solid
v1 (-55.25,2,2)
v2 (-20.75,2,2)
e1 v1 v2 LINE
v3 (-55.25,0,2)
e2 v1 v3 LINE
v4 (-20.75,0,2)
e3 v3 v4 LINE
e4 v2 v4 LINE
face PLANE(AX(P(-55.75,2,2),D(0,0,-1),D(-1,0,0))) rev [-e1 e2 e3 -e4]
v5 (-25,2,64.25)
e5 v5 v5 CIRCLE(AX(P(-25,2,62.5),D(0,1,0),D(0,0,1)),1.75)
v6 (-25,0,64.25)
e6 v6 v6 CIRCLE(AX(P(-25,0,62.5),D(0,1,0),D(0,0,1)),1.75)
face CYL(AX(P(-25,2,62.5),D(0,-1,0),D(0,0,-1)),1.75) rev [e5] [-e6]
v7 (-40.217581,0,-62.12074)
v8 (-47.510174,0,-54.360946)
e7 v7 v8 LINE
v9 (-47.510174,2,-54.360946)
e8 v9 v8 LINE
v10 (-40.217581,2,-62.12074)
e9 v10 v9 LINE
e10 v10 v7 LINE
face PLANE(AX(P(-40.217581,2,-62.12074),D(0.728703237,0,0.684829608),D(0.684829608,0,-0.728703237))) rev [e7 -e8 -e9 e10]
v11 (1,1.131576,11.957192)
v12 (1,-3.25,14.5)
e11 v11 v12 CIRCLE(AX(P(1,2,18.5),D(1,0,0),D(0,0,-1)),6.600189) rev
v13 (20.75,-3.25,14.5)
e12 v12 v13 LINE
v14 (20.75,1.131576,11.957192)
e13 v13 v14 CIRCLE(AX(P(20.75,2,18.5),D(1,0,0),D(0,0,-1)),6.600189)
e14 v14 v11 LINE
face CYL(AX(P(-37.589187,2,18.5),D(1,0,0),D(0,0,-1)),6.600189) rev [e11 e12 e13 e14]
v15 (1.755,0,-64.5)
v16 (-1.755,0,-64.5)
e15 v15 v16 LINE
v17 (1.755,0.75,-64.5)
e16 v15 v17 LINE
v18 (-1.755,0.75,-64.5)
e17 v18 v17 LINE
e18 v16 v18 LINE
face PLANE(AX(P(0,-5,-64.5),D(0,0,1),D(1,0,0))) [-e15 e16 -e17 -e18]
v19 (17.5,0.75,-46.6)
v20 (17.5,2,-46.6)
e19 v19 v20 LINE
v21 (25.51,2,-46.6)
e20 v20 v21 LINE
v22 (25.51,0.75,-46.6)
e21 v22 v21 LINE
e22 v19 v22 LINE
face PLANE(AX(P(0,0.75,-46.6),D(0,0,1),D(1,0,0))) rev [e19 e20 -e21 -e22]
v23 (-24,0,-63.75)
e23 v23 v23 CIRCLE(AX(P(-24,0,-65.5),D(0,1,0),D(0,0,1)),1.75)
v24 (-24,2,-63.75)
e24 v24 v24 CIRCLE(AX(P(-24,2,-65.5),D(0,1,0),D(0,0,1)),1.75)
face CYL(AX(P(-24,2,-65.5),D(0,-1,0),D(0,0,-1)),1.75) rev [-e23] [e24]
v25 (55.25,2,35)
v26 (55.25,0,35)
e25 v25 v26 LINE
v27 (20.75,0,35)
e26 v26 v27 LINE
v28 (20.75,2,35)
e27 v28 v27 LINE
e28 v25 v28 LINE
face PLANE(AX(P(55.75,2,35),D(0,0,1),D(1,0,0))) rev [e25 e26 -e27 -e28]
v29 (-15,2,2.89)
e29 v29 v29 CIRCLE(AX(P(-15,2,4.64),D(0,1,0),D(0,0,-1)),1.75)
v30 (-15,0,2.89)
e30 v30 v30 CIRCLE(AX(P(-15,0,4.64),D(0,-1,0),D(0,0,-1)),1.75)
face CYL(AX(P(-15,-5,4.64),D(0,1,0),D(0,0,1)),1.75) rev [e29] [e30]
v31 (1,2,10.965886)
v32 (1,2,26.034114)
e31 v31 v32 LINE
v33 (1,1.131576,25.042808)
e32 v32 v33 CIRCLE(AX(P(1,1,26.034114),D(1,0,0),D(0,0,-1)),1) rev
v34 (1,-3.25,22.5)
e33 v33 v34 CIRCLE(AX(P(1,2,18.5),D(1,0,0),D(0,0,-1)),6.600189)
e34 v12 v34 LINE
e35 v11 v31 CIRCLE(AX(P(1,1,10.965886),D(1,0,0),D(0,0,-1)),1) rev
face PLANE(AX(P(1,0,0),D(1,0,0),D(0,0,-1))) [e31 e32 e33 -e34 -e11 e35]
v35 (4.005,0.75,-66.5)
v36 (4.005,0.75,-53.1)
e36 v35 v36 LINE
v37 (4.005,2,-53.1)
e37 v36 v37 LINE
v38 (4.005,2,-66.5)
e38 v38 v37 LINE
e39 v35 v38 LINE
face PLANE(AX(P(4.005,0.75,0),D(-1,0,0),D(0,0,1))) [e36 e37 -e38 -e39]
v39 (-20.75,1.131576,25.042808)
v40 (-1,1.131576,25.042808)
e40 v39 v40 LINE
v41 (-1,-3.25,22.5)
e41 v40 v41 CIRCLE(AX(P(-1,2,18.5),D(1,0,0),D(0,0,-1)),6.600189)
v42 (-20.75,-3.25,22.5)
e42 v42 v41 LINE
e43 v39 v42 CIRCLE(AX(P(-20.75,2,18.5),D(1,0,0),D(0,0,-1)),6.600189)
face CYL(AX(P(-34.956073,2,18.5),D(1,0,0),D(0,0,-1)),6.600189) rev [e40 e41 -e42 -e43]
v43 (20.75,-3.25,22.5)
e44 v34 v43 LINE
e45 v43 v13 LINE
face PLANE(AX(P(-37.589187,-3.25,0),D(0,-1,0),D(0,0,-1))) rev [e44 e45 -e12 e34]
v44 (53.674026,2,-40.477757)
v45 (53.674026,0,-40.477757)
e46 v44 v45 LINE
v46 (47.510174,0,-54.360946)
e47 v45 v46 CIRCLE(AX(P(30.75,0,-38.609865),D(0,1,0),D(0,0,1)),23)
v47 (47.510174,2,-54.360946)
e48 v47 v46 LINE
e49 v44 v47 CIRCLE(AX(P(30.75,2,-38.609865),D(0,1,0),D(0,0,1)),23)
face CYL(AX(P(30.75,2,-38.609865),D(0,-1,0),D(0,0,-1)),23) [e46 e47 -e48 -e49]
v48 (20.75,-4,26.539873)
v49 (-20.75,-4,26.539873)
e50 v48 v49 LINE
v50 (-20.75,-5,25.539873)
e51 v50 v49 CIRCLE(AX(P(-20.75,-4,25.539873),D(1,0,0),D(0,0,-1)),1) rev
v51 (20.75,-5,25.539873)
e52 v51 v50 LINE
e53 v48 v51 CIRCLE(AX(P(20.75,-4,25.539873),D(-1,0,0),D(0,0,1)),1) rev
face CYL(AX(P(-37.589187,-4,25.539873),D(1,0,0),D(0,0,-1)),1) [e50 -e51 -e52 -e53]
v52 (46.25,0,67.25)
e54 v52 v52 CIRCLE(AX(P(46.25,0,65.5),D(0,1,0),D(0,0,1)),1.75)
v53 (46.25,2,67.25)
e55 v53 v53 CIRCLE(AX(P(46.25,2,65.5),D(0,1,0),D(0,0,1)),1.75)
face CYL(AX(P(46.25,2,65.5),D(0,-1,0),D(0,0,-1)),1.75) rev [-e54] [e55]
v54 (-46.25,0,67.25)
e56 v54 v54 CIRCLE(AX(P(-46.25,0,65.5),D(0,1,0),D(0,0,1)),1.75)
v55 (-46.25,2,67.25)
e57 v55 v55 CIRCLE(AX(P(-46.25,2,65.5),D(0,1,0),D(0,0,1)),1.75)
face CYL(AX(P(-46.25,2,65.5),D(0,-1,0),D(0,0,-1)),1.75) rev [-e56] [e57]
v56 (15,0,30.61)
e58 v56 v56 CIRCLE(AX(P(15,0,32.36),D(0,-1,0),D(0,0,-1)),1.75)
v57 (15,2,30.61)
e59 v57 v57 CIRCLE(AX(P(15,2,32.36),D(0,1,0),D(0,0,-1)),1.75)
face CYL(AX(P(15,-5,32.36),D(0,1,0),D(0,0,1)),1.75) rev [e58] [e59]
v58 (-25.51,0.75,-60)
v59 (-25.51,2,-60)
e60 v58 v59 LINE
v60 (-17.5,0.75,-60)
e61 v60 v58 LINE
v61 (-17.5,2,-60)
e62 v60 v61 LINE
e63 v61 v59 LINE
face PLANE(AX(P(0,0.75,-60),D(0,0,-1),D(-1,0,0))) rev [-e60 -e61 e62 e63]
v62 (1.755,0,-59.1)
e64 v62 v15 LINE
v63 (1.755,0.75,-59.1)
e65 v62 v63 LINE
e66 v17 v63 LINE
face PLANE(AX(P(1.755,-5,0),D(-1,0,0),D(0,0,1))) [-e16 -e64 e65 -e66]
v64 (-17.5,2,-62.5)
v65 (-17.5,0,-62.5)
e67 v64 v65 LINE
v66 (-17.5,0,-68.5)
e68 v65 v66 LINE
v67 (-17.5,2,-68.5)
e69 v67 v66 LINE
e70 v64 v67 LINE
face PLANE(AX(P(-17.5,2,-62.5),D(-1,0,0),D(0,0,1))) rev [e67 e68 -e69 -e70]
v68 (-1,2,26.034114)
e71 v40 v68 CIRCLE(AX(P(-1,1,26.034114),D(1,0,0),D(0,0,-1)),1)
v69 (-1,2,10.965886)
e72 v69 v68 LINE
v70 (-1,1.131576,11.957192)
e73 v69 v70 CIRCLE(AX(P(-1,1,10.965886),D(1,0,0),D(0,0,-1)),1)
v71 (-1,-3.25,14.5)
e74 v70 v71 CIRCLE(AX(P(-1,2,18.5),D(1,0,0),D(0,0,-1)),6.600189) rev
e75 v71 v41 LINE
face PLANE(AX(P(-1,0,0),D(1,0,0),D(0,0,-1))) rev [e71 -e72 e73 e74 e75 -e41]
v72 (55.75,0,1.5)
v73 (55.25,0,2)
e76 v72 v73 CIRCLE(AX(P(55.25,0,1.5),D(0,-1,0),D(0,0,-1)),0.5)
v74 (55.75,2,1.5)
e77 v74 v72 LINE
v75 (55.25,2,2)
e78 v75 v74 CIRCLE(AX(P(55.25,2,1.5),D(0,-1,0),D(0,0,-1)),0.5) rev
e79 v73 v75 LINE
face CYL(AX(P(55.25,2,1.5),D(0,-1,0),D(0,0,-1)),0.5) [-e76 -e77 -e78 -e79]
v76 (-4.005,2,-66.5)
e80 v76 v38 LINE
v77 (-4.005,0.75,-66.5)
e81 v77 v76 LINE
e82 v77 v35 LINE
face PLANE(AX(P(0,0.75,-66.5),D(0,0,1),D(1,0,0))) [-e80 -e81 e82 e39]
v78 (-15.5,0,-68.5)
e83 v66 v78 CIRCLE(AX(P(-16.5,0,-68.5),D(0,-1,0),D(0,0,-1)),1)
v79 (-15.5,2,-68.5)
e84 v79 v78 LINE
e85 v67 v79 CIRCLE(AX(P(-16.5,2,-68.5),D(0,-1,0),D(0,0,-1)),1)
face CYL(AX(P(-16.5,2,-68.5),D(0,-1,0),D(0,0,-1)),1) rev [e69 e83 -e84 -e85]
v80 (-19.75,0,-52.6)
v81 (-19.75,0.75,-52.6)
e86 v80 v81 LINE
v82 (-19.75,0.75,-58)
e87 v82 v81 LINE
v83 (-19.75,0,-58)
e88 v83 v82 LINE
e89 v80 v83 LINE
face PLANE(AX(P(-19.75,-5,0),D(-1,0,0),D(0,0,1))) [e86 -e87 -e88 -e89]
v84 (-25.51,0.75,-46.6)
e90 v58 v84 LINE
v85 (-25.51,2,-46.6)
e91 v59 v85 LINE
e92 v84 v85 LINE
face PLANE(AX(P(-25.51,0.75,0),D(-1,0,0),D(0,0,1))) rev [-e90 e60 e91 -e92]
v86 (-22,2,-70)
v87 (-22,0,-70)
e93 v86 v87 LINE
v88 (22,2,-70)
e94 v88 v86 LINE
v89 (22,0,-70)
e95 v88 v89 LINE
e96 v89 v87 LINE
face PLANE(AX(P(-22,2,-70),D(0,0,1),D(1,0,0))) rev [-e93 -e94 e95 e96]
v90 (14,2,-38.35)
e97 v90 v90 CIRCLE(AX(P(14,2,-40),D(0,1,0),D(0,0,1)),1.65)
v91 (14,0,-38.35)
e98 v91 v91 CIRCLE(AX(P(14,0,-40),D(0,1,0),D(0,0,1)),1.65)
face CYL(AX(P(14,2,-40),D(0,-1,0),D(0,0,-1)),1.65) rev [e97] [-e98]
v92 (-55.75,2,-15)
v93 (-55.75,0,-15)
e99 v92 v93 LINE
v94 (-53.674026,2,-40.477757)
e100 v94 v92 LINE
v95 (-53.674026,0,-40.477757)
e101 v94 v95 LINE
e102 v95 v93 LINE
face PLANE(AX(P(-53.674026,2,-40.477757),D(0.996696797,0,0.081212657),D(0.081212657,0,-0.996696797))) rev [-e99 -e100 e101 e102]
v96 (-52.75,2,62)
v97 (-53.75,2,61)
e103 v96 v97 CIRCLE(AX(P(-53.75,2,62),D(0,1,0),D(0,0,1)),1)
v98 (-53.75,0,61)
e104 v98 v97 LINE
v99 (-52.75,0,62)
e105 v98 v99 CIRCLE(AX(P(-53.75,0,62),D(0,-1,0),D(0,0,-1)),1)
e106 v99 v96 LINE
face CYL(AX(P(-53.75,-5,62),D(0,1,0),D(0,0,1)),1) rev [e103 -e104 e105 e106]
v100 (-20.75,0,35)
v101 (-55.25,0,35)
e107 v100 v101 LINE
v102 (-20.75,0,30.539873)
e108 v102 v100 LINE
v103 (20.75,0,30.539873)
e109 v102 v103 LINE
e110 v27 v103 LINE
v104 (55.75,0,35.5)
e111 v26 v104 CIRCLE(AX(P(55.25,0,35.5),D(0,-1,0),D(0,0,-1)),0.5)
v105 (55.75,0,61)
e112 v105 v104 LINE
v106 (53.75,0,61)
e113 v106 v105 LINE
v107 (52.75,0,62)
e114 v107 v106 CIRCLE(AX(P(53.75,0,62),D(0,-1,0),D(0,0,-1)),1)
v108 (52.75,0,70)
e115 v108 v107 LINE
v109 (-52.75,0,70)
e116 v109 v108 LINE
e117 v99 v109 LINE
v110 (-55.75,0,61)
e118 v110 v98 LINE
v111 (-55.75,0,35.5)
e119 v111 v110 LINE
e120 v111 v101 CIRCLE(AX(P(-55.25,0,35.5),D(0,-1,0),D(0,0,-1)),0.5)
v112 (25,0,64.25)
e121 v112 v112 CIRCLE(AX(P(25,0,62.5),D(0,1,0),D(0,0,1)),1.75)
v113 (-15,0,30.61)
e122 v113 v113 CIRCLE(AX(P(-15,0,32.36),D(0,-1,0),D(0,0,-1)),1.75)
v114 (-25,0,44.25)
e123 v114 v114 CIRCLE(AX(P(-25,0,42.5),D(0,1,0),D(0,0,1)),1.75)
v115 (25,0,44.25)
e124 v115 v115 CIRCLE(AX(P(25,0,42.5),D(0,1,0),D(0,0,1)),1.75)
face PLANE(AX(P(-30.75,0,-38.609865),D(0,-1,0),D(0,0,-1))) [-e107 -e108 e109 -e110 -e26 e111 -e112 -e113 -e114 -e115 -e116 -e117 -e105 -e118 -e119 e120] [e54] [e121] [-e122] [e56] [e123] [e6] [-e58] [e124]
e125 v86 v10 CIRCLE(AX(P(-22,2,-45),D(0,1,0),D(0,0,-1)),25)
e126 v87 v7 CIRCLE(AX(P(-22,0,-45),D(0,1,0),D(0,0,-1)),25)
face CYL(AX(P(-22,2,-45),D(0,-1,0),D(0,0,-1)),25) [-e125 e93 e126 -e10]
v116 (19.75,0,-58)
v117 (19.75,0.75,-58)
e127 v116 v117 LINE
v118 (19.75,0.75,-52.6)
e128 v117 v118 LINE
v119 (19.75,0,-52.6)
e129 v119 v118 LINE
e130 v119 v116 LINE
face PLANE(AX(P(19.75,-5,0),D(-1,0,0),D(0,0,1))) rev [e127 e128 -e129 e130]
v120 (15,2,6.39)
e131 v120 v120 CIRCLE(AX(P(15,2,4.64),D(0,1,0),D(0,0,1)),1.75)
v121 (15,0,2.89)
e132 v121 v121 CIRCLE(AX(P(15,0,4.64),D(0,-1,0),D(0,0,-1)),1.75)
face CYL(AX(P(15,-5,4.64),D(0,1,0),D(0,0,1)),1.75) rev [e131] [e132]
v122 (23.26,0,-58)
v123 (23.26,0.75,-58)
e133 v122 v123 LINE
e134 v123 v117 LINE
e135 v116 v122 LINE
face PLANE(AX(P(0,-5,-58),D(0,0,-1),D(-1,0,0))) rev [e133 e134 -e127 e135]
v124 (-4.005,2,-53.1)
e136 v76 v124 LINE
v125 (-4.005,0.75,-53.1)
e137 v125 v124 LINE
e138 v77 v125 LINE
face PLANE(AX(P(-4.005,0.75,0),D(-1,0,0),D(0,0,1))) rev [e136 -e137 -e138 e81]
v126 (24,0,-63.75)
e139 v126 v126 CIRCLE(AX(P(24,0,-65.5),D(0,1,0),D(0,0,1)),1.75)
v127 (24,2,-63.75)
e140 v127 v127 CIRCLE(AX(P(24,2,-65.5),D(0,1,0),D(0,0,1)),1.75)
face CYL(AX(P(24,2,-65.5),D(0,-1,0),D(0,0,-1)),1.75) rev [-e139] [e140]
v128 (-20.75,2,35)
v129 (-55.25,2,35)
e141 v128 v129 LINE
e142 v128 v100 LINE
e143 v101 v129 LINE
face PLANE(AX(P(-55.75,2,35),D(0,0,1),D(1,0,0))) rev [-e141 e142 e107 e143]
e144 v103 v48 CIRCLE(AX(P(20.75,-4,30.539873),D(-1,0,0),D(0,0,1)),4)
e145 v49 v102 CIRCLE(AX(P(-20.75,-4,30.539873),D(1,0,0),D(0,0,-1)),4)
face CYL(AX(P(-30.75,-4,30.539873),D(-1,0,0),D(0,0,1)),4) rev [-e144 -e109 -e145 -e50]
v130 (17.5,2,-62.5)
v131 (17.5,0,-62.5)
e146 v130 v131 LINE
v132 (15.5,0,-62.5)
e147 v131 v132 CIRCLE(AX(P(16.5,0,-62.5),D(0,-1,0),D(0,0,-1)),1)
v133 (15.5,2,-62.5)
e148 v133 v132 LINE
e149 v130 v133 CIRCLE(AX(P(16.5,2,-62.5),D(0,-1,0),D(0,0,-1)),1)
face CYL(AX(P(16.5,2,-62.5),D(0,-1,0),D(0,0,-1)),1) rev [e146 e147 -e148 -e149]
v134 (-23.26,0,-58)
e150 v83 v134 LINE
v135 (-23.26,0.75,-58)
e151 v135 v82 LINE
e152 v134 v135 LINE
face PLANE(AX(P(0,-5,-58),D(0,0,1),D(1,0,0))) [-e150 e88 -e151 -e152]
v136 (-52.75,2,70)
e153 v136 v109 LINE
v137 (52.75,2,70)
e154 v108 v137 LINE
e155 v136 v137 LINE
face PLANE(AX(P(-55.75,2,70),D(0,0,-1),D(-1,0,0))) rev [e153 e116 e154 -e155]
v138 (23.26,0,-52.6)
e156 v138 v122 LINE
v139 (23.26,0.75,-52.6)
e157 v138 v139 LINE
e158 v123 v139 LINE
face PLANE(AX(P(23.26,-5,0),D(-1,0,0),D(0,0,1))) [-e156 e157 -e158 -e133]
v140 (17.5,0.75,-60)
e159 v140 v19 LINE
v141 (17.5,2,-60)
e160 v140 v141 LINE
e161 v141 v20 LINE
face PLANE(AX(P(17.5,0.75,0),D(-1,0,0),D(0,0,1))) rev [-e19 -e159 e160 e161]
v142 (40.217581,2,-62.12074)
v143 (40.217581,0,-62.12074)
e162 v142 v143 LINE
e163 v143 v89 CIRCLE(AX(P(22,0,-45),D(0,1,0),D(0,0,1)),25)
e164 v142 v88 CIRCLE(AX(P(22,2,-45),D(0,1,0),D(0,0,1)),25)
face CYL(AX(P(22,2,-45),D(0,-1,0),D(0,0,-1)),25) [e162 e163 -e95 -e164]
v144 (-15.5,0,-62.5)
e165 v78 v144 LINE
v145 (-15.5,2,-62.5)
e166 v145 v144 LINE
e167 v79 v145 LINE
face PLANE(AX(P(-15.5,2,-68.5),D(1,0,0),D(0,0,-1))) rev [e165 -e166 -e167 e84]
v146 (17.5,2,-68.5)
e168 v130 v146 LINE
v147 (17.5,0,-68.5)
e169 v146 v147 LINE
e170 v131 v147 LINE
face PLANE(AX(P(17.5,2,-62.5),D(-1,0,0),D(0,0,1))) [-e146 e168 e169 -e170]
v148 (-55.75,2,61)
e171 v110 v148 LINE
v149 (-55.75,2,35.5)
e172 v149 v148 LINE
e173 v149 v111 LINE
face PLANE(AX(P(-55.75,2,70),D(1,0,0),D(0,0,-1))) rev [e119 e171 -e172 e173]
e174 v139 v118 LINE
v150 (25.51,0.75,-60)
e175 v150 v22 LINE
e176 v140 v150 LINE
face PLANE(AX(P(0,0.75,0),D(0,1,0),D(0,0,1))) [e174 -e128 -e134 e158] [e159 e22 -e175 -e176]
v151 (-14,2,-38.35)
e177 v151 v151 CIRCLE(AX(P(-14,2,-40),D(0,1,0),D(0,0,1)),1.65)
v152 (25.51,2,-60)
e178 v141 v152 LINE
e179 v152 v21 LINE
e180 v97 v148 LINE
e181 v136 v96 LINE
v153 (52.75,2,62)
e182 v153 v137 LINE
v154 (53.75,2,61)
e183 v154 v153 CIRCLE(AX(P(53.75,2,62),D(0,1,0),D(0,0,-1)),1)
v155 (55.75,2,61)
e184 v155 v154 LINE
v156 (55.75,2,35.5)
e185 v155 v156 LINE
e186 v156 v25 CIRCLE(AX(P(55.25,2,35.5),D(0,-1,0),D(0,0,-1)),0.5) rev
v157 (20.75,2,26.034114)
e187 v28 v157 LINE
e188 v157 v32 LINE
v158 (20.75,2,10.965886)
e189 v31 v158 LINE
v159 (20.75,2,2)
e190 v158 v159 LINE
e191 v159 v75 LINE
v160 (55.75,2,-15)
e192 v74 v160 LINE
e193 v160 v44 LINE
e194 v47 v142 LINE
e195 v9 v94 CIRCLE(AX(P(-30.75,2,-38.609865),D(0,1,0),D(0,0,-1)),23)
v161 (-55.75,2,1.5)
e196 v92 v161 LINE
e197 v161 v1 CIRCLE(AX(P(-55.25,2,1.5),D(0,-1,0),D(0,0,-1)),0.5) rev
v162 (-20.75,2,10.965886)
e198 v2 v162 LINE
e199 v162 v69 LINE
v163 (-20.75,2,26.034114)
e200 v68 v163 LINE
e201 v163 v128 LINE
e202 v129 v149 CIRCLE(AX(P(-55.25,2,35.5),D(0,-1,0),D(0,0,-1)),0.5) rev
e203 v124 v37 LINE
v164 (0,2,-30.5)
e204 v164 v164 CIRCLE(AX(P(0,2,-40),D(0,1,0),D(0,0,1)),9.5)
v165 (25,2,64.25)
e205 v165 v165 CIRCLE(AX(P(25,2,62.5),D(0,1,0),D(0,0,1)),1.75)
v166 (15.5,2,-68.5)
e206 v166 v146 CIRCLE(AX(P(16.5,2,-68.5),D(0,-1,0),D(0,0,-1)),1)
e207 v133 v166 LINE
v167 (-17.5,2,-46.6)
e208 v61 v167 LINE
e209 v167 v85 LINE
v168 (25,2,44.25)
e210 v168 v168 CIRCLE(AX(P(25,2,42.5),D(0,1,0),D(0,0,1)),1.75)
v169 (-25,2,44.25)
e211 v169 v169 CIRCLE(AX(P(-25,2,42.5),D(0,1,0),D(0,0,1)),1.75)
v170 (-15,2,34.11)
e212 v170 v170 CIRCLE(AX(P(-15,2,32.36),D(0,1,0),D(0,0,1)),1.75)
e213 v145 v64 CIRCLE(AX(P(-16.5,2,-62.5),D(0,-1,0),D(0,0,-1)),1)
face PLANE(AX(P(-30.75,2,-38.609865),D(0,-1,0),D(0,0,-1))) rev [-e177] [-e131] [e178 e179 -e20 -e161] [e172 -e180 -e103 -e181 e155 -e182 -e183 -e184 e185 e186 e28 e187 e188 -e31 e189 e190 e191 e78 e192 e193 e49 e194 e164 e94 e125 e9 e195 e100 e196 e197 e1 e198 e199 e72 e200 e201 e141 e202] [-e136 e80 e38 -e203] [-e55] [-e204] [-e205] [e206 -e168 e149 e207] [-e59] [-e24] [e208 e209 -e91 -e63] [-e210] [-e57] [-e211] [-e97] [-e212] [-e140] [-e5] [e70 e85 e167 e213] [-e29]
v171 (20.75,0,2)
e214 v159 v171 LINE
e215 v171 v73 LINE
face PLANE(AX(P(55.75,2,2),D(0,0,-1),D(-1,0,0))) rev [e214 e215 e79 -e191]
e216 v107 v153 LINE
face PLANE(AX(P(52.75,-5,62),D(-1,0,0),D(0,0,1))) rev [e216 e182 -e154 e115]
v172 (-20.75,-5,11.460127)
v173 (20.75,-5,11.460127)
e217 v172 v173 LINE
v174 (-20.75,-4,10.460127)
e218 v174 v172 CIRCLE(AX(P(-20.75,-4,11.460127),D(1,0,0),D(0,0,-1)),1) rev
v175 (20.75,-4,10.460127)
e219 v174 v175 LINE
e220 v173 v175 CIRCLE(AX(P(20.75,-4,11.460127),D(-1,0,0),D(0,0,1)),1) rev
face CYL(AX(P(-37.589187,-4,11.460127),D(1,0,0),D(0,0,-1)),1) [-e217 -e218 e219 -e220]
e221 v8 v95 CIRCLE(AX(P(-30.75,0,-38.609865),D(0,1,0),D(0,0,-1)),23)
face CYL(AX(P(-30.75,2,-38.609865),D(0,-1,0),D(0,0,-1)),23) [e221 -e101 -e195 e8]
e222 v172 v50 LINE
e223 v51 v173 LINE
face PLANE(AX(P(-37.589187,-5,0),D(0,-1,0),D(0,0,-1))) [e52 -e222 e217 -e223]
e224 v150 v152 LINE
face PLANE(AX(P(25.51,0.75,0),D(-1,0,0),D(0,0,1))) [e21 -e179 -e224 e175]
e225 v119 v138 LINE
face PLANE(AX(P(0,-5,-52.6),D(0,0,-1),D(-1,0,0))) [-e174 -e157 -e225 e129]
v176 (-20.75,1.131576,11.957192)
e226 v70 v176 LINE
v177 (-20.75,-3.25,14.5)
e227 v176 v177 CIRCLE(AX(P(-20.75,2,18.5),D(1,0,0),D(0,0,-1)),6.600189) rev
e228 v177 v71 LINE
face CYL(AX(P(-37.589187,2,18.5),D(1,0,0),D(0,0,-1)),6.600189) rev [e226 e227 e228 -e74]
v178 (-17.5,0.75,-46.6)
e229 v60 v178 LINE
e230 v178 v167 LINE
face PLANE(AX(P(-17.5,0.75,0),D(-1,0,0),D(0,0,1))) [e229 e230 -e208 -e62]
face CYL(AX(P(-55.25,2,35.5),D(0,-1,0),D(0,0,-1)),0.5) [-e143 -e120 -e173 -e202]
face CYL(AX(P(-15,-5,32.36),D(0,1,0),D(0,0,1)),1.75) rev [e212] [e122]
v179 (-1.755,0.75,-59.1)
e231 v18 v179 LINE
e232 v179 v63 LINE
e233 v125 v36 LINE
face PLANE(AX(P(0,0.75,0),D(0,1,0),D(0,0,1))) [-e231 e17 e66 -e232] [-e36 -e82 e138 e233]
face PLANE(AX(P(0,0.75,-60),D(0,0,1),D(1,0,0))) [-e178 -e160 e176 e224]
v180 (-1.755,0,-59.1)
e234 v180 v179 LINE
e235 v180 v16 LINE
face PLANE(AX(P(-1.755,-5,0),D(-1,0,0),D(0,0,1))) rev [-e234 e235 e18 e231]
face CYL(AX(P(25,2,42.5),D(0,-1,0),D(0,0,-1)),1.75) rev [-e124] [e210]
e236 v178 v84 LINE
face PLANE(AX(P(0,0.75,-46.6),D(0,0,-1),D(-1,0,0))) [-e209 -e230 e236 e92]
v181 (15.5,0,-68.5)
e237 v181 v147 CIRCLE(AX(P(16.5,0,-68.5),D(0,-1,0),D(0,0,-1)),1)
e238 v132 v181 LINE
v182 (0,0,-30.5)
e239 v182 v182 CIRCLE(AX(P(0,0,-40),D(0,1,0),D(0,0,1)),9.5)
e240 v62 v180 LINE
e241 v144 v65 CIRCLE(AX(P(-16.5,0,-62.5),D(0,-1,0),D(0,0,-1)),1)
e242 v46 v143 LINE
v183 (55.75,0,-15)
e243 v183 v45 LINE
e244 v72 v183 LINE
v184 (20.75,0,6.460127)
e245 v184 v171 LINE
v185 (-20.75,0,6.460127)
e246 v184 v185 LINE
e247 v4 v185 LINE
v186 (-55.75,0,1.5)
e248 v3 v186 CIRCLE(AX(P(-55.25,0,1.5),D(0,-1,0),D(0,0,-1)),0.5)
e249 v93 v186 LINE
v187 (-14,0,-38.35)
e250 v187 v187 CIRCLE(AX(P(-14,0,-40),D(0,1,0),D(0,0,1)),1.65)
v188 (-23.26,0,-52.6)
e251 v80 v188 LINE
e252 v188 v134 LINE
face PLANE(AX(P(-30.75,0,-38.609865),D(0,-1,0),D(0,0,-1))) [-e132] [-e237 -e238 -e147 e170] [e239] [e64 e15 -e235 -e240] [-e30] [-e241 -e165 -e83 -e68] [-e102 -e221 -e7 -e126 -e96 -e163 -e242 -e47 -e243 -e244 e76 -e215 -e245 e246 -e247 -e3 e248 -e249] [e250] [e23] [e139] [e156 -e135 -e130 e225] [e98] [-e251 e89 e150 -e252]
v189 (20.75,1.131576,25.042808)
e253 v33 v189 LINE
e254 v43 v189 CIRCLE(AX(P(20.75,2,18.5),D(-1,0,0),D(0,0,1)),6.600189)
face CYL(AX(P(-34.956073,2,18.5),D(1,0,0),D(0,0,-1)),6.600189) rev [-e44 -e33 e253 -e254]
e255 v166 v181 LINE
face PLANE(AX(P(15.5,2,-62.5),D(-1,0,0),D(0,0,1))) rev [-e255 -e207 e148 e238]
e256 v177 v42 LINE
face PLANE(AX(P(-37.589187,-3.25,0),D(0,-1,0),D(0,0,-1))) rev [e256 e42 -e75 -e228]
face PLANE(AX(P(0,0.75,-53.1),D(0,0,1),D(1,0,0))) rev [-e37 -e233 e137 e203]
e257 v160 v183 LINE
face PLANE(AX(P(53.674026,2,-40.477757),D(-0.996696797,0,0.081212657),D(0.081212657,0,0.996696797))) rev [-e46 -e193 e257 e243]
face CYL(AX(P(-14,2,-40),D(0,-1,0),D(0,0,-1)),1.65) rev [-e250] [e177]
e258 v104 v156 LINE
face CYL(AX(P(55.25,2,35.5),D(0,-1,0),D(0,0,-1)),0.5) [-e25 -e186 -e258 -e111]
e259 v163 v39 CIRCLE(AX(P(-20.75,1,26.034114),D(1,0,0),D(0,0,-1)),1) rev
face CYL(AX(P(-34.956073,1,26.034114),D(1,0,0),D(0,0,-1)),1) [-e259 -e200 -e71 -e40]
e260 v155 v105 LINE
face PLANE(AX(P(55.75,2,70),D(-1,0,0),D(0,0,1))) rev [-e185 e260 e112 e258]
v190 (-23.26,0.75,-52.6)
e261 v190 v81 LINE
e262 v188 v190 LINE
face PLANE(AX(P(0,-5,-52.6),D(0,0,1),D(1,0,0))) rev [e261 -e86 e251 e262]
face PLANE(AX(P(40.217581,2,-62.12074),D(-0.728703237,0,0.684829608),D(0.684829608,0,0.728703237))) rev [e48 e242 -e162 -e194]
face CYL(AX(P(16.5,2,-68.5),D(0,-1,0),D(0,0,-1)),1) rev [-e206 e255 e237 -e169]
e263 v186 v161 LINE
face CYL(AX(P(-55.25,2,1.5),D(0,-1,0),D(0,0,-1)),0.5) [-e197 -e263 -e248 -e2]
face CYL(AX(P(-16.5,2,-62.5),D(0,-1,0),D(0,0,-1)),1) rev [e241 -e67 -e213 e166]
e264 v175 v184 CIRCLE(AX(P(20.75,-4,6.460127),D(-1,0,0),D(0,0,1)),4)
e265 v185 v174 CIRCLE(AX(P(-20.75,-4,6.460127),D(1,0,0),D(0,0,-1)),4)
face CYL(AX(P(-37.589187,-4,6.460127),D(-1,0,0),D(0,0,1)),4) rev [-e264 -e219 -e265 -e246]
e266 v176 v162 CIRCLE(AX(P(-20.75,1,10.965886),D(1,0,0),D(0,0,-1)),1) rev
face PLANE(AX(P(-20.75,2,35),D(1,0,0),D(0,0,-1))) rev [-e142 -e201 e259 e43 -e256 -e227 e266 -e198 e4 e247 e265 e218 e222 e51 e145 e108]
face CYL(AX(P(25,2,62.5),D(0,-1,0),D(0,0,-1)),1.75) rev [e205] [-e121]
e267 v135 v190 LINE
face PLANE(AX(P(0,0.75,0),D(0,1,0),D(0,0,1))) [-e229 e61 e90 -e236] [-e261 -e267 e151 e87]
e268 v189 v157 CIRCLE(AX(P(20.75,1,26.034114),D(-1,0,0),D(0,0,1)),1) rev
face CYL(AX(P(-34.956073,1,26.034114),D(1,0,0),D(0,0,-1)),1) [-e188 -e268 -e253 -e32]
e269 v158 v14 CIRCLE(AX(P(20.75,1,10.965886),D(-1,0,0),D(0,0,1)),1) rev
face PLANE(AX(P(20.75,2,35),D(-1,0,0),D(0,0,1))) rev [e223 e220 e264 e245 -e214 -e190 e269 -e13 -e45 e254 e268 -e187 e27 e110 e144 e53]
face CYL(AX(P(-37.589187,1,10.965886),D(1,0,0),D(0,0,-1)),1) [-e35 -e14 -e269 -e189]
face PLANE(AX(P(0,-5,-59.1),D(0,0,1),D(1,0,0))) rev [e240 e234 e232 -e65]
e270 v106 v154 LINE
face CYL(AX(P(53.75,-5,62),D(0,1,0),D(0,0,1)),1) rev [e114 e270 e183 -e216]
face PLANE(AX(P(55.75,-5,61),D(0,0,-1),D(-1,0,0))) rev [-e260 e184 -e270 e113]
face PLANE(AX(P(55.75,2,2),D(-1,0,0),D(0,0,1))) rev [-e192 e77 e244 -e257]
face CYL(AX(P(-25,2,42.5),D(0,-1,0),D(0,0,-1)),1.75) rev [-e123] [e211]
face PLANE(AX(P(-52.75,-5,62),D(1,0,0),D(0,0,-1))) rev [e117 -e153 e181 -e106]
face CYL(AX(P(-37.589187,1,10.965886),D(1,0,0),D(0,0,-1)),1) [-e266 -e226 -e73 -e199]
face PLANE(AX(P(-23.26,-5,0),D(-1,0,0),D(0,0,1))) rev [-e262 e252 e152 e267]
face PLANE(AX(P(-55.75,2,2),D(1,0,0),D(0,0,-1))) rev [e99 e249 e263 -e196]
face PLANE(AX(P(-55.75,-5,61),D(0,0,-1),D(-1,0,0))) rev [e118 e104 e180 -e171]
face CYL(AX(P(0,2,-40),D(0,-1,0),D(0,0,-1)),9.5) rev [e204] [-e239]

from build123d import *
from OCP.BRepFilletAPI import BRepFilletAPI_MakeFillet

# Parameters (mm, degrees)
SKETCH1_R               = 1.75
SKETCH1_R_2             = 1.65
SKETCH1_R_3             = 9.5
BOSS_EXTRUDE1_DEPTH     = 2
CUT_EXTRUDE1_DEPTH      = 41.5
BOSS_EXTRUDE2_DEPTH     = 41.5
SKETCH6_W               = 16.079745626
SKETCH6_H               = 7
BOSS_EXTRUDE3_DEPTH     = 1
FILLET1_R               = 4
FILLET1_R_2             = 1
SKETCH7_R               = 1.75
CUT_EXTRUDE2_DEPTH      = 90.76114137
FILLET2_R               = 0.5
CUT_EXTRUDE3_DEPTH      = 90.76114137
SKETCH9_W               = 8.01
SKETCH9_H               = 13.4
SKETCH9_W_2             = 3.51
SKETCH9_H_2             = 5.4
CUT_EXTRUDE4_DEPTH      = 1.25
SKETCH9_4_W             = 3.51
SKETCH9_4_H             = 5.4
CUT_EXTRUDE5_DEPTH      = 90.76114137
ENL_V_MAT_EXTRU_1_DEPTH = 90.627353526


with BuildPart() as part:
    # Sketch1 → Boss-Extrude1 (new body)
    with BuildSketch(Plane(origin=(0, 0, 0), x_dir=(1, 0, 0), z_dir=(0, 1, 0))):
        with BuildLine():
            Line((-22, 70), (22, 70))
            ThreePointArc((22, 70), (31.924250474, 67.945789429), (40.217580929, 62.120740202))
            Line((40.217580929, 62.120740202), (47.510174455, 54.360946457))
            ThreePointArc((47.510174455, 54.360946457), (51.771291303, 47.94288813), (53.674026321, 40.47775659))
            Line((53.674026321, 40.47775659), (55.75, 15))
            Line((55.75, 15), (55.75, -2))
            Line((55.75, -2), (20.75, -2))
            Line((20.75, -2), (20.75, -35))
            Line((20.75, -35), (55.75, -35))
            Line((55.75, -35), (55.75, -70))
            Line((55.75, -70), (-55.75, -70))
            Line((-55.75, -70), (-55.75, -35))
            Line((-55.75, -35), (-20.75, -35))
            Line((-20.75, -35), (-20.75, -2))
            Line((-20.75, -2), (-55.75, -2))
            Line((-55.75, -2), (-55.75, 15))
            Line((-55.75, 15), (-53.674026321, 40.47775659))
            ThreePointArc((-53.674026321, 40.47775659), (-51.771291303, 47.94288813), (-47.510174455, 54.360946457))
            Line((-47.510174455, 54.360946457), (-40.217580929, 62.120740202))
            ThreePointArc((-40.217580929, 62.120740202), (-31.924250474, 67.945789429), (-22, 70))
        make_face()
        with Locations(Location((-46.25, -65.5, 0), (0, 0, 270))):
            Circle(SKETCH1_R, mode=Mode.SUBTRACT)
        with Locations(Location((46.25, -65.5, 0), (0, 0, 270))):
            Circle(SKETCH1_R, mode=Mode.SUBTRACT)
        with Locations(Location((-24, 65.5, 0), (0, 0, 270))):
            Circle(SKETCH1_R, mode=Mode.SUBTRACT)
        with Locations(Location((24, 65.5, 0), (0, 0, 270))):
            Circle(SKETCH1_R, mode=Mode.SUBTRACT)
        with Locations(Location((-25, -42.5, 0), (0, 0, 270))):
            Circle(SKETCH1_R, mode=Mode.SUBTRACT)
        with Locations(Location((-25, -62.5, 0), (0, 0, 270))):
            Circle(SKETCH1_R, mode=Mode.SUBTRACT)
        with Locations(Location((25, -42.5, 0), (0, 0, 270))):
            Circle(SKETCH1_R, mode=Mode.SUBTRACT)
        with Locations(Location((25, -62.5, 0), (0, 0, 270))):
            Circle(SKETCH1_R, mode=Mode.SUBTRACT)
        with Locations(Location((-14, 40, 0), (0, 0, 270))):
            Circle(SKETCH1_R_2, mode=Mode.SUBTRACT)
        with Locations(Location((14, 40, 0), (0, 0, 270))):
            Circle(SKETCH1_R_2, mode=Mode.SUBTRACT)
        with Locations(Location((0, 40, 0), (0, 0, 270))):
            Circle(SKETCH1_R_3, mode=Mode.SUBTRACT)
    extrude(amount=BOSS_EXTRUDE1_DEPTH)

    # Sketch5 → Cut-Extrude1 (cut)
    with BuildSketch(Plane(origin=(20.75, 0, 0), x_dir=(0, 0, -1), z_dir=(1, 0, 0))):
        with BuildLine():
            Line((-25.100189391, 2), (-11.899810609, 2))
            ThreePointArc((-11.899810609, 2), (-12.585473072, -0.929312414), (-14.5, -3.25))
            Line((-14.5, -3.25), (-22.5, -3.25))
            ThreePointArc((-22.5, -3.25), (-24.414526928, -0.929312414), (-25.100189391, 2))
        make_face()
    extrude(amount=-CUT_EXTRUDE1_DEPTH, mode=Mode.SUBTRACT)


with BuildPart() as cut_extrude1_piece_1:
    # of the separate pieces the step leaves, piece 1, a body of its own (cut_extrude1_pieces)
    add(part.part.solids().sort_by_distance((-22, 0, -70))[0])



with BuildPart() as cut_extrude1_piece_2:
    # of the separate pieces the step leaves, piece 2, a body of its own (cut_extrude1_pieces)
    add(part.part.solids().sort_by_distance((-20.75, 0, 35))[0])

    # Sketch5<3> → Boss-Extrude2 (add)
    with BuildSketch(Plane(origin=(20.75, 0, 0), x_dir=(0, 0, -1), z_dir=(1, 0, 0))):
        with BuildLine():
            Line((-24.789872813, 0), (-26.539872813, 0))
            Line((-26.539872813, 0), (-26.539872813, -5))
            Line((-26.539872813, -5), (-10.460127187, -5))
            Line((-10.460127187, -5), (-10.460127187, 0))
            Line((-10.460127187, 0), (-12.210127187, 0))
            ThreePointArc((-12.210127187, 0), (-13.10453935, -1.801513432), (-14.5, -3.25))
            Line((-14.5, -3.25), (-22.5, -3.25))
            ThreePointArc((-22.5, -3.25), (-23.89546065, -1.801513432), (-24.789872813, 0))
        make_face()
    extrude(amount=-BOSS_EXTRUDE2_DEPTH)


with BuildPart() as cut_extrude1_piece_1_1:
    add(cut_extrude1_piece_1.part)

    add(cut_extrude1_piece_2.part)  # Boss-Extrude3 merges Cut-Extrude1 piece 2
    # Sketch6 → Boss-Extrude3 (add, symmetric)
    with BuildSketch(Plane(origin=(0, 0, 0), x_dir=(0, 0, -1), z_dir=(1, 0, 0))):
        with Locations((-18.5, -1.5)):
            Rectangle(SKETCH6_W, SKETCH6_H)
    extrude(amount=BOSS_EXTRUDE3_DEPTH, both=True)

    # Fillet1
    fillet1_edges_1 = [cut_extrude1_piece_1_1.edges().sort_by_distance(p)[0] for p in [
        (0, 0, 26.539872813),
        (0, 0, 10.460127187),
    ]]
    fillet1_edges_2 = [cut_extrude1_piece_1_1.edges().sort_by_distance(p)[0] for p in [
        (0, -5, 26.539872813),
        (0, -5, 10.460127187),
        (-10.875, 2, 25.100189391),
        (10.875, 2, 25.100189391),
        (10.875, 2, 11.899810609),
        (-10.875, 2, 11.899810609),
    ]]
    fillet1 = BRepFilletAPI_MakeFillet(cut_extrude1_piece_1_1.part.solid().wrapped)
    for e in fillet1_edges_1:
        fillet1.Add(FILLET1_R - 0.0001, e.wrapped)
    for e in fillet1_edges_2:
        fillet1.Add(FILLET1_R_2 - 0.0001, e.wrapped)
    add(Compound.cast(fillet1.Shape()), mode=Mode.REPLACE)  # a hair under: the kernel refuses the full size

    # Sketch7 → Cut-Extrude2 (cut, through all)
    with BuildSketch(Plane(origin=(0, 2, 0), x_dir=(1, 0, 0), z_dir=(0, 1, 0))):
        with Locations(Location((15, -4.64, 0), (0, 0, 270))):
            Circle(SKETCH7_R)
        with Locations(Location((-15, -4.64, 0), (0, 0, 90))):
            Circle(SKETCH7_R)
        with Locations(Location((-15, -32.36, 0), (0, 0, 270))):
            Circle(SKETCH7_R)
        with Locations(Location((15, -32.36, 0), (0, 0, 90))):
            Circle(SKETCH7_R)
    extrude(amount=-CUT_EXTRUDE2_DEPTH, mode=Mode.SUBTRACT)

    # Fillet2
    fillet2_edges = [cut_extrude1_piece_1_1.edges().sort_by_distance(p)[0] for p in [
        (-55.75, 1, 35),
        (55.75, 1, 35),
        (55.75, 1, 2),
        (-55.75, 1, 2),
    ]]
    fillet(fillet2_edges, radius=FILLET2_R)

    # Sketch8 → Cut-Extrude3 (cut, through all)
    with BuildSketch(Plane(origin=(0, 2, 0), x_dir=(1, 0, 0), z_dir=(0, 1, 0))):
        with BuildLine():
            Line((-55.75, -61), (-53.75, -61))
            ThreePointArc((-53.75, -61), (-53.042893219, -61.292893219), (-52.75, -62))
            Line((-52.75, -62), (-52.75, -70))
            Line((-52.75, -70), (-55.75, -70))
            Line((-55.75, -70), (-55.75, -61))
        make_face()
        with BuildLine():
            Line((55.75, -61), (53.75, -61))
            ThreePointArc((53.75, -61), (53.042893219, -61.292893219), (52.75, -62))
            Line((52.75, -62), (52.75, -70))
            Line((52.75, -70), (55.75, -70))
            Line((55.75, -70), (55.75, -61))
        make_face()
    extrude(amount=-CUT_EXTRUDE3_DEPTH, mode=Mode.SUBTRACT)

    # Sketch9 → Cut-Extrude4 (cut)
    # profile 1 of 6: a face of its own
    with BuildSketch(Plane(origin=(0, 2, 0), x_dir=(1, 0, 0), z_dir=(0, 1, 0))):
        with Locations((-21.505, 53.3)):
            Rectangle(SKETCH9_W, SKETCH9_H)
        with Locations((-21.505, 55.3)):
            Rectangle(SKETCH9_W_2, SKETCH9_H_2, mode=Mode.SUBTRACT)
    # profile 2 of 6: a face of its own
    with BuildSketch(Plane(origin=(0, 2, 0), x_dir=(1, 0, 0), z_dir=(0, 1, 0))):
        with Locations((-21.505, 55.3)):
            Rectangle(SKETCH9_W_2, SKETCH9_H_2)
    # profile 3 of 6: a face of its own
    with BuildSketch(Plane(origin=(0, 2, 0), x_dir=(1, 0, 0), z_dir=(0, 1, 0))):
        with Locations((0, 59.8)):
            Rectangle(SKETCH9_W, SKETCH9_H)
        with Locations((0, 61.8)):
            Rectangle(SKETCH9_W_2, SKETCH9_H_2, mode=Mode.SUBTRACT)
    # profile 4 of 6: a face of its own
    with BuildSketch(Plane(origin=(0, 2, 0), x_dir=(1, 0, 0), z_dir=(0, 1, 0))):
        with Locations((0, 61.8)):
            Rectangle(SKETCH9_W_2, SKETCH9_H_2)
    # profile 5 of 6: a face of its own
    with BuildSketch(Plane(origin=(0, 2, 0), x_dir=(1, 0, 0), z_dir=(0, 1, 0))):
        with Locations((21.505, 53.3)):
            Rectangle(SKETCH9_W, SKETCH9_H)
        with Locations((21.505, 55.3)):
            Rectangle(SKETCH9_W_2, SKETCH9_H_2, mode=Mode.SUBTRACT)
    # profile 6 of 6: a face of its own
    with BuildSketch(Plane(origin=(0, 2, 0), x_dir=(1, 0, 0), z_dir=(0, 1, 0))):
        with Locations((21.505, 55.3)):
            Rectangle(SKETCH9_W_2, SKETCH9_H_2)
    extrude(amount=-CUT_EXTRUDE4_DEPTH, mode=Mode.SUBTRACT)

    # Sketch9<4> → Cut-Extrude5 (cut, through all)
    with BuildSketch(Plane(origin=(0, 2, 0), x_dir=(1, 0, 0), z_dir=(0, 1, 0))):
        with Locations((-21.505, 55.3)):
            Rectangle(SKETCH9_4_W, SKETCH9_4_H)
        with Locations((0, 61.8)):
            Rectangle(SKETCH9_4_W, SKETCH9_4_H)
        with Locations((21.505, 55.3)):
            Rectangle(SKETCH9_4_W, SKETCH9_4_H)
    extrude(amount=-CUT_EXTRUDE5_DEPTH, mode=Mode.SUBTRACT)

    # Esquisse1 → Enlèv. mat.-Extru.1 (cut, through all)
    with BuildSketch(Plane.XZ):
        with BuildLine():
            Line((17.25, -62.5), (17.25, -68.5))
            ThreePointArc((17.25, -68.5), (16.5, -69.25), (15.75, -68.5))
            Line((15.75, -68.5), (15.75, -62.5))
            ThreePointArc((15.75, -62.5), (16.5, -61.75), (17.25, -62.5))
        make_face()
        with BuildLine():
            Line((-17.25, -62.5), (-17.25, -68.5))
            ThreePointArc((-17.25, -68.5), (-16.5, -69.25), (-15.75, -68.5))
            Line((-15.75, -68.5), (-15.75, -62.5))
            ThreePointArc((-15.75, -62.5), (-16.5, -61.75), (-17.25, -62.5))
        make_face()
        with BuildLine():
            Line((17.5, -62.5), (17.5, -68.5))
            ThreePointArc((17.5, -68.5), (16.5, -69.5), (15.5, -68.5))
            Line((15.5, -68.5), (15.5, -62.5))
            ThreePointArc((15.5, -62.5), (16.5, -61.5), (17.5, -62.5))
        make_face()
        with BuildLine():
            Line((-17.5, -62.5), (-17.5, -68.5))
            ThreePointArc((-17.5, -68.5), (-16.5, -69.5), (-15.5, -68.5))
            Line((-15.5, -68.5), (-15.5, -62.5))
            ThreePointArc((-15.5, -62.5), (-16.5, -61.5), (-17.5, -62.5))
        make_face()
    extrude(amount=-ENL_V_MAT_EXTRU_1_DEPTH, mode=Mode.SUBTRACT)


solid = cut_extrude1_piece_1_1.part
